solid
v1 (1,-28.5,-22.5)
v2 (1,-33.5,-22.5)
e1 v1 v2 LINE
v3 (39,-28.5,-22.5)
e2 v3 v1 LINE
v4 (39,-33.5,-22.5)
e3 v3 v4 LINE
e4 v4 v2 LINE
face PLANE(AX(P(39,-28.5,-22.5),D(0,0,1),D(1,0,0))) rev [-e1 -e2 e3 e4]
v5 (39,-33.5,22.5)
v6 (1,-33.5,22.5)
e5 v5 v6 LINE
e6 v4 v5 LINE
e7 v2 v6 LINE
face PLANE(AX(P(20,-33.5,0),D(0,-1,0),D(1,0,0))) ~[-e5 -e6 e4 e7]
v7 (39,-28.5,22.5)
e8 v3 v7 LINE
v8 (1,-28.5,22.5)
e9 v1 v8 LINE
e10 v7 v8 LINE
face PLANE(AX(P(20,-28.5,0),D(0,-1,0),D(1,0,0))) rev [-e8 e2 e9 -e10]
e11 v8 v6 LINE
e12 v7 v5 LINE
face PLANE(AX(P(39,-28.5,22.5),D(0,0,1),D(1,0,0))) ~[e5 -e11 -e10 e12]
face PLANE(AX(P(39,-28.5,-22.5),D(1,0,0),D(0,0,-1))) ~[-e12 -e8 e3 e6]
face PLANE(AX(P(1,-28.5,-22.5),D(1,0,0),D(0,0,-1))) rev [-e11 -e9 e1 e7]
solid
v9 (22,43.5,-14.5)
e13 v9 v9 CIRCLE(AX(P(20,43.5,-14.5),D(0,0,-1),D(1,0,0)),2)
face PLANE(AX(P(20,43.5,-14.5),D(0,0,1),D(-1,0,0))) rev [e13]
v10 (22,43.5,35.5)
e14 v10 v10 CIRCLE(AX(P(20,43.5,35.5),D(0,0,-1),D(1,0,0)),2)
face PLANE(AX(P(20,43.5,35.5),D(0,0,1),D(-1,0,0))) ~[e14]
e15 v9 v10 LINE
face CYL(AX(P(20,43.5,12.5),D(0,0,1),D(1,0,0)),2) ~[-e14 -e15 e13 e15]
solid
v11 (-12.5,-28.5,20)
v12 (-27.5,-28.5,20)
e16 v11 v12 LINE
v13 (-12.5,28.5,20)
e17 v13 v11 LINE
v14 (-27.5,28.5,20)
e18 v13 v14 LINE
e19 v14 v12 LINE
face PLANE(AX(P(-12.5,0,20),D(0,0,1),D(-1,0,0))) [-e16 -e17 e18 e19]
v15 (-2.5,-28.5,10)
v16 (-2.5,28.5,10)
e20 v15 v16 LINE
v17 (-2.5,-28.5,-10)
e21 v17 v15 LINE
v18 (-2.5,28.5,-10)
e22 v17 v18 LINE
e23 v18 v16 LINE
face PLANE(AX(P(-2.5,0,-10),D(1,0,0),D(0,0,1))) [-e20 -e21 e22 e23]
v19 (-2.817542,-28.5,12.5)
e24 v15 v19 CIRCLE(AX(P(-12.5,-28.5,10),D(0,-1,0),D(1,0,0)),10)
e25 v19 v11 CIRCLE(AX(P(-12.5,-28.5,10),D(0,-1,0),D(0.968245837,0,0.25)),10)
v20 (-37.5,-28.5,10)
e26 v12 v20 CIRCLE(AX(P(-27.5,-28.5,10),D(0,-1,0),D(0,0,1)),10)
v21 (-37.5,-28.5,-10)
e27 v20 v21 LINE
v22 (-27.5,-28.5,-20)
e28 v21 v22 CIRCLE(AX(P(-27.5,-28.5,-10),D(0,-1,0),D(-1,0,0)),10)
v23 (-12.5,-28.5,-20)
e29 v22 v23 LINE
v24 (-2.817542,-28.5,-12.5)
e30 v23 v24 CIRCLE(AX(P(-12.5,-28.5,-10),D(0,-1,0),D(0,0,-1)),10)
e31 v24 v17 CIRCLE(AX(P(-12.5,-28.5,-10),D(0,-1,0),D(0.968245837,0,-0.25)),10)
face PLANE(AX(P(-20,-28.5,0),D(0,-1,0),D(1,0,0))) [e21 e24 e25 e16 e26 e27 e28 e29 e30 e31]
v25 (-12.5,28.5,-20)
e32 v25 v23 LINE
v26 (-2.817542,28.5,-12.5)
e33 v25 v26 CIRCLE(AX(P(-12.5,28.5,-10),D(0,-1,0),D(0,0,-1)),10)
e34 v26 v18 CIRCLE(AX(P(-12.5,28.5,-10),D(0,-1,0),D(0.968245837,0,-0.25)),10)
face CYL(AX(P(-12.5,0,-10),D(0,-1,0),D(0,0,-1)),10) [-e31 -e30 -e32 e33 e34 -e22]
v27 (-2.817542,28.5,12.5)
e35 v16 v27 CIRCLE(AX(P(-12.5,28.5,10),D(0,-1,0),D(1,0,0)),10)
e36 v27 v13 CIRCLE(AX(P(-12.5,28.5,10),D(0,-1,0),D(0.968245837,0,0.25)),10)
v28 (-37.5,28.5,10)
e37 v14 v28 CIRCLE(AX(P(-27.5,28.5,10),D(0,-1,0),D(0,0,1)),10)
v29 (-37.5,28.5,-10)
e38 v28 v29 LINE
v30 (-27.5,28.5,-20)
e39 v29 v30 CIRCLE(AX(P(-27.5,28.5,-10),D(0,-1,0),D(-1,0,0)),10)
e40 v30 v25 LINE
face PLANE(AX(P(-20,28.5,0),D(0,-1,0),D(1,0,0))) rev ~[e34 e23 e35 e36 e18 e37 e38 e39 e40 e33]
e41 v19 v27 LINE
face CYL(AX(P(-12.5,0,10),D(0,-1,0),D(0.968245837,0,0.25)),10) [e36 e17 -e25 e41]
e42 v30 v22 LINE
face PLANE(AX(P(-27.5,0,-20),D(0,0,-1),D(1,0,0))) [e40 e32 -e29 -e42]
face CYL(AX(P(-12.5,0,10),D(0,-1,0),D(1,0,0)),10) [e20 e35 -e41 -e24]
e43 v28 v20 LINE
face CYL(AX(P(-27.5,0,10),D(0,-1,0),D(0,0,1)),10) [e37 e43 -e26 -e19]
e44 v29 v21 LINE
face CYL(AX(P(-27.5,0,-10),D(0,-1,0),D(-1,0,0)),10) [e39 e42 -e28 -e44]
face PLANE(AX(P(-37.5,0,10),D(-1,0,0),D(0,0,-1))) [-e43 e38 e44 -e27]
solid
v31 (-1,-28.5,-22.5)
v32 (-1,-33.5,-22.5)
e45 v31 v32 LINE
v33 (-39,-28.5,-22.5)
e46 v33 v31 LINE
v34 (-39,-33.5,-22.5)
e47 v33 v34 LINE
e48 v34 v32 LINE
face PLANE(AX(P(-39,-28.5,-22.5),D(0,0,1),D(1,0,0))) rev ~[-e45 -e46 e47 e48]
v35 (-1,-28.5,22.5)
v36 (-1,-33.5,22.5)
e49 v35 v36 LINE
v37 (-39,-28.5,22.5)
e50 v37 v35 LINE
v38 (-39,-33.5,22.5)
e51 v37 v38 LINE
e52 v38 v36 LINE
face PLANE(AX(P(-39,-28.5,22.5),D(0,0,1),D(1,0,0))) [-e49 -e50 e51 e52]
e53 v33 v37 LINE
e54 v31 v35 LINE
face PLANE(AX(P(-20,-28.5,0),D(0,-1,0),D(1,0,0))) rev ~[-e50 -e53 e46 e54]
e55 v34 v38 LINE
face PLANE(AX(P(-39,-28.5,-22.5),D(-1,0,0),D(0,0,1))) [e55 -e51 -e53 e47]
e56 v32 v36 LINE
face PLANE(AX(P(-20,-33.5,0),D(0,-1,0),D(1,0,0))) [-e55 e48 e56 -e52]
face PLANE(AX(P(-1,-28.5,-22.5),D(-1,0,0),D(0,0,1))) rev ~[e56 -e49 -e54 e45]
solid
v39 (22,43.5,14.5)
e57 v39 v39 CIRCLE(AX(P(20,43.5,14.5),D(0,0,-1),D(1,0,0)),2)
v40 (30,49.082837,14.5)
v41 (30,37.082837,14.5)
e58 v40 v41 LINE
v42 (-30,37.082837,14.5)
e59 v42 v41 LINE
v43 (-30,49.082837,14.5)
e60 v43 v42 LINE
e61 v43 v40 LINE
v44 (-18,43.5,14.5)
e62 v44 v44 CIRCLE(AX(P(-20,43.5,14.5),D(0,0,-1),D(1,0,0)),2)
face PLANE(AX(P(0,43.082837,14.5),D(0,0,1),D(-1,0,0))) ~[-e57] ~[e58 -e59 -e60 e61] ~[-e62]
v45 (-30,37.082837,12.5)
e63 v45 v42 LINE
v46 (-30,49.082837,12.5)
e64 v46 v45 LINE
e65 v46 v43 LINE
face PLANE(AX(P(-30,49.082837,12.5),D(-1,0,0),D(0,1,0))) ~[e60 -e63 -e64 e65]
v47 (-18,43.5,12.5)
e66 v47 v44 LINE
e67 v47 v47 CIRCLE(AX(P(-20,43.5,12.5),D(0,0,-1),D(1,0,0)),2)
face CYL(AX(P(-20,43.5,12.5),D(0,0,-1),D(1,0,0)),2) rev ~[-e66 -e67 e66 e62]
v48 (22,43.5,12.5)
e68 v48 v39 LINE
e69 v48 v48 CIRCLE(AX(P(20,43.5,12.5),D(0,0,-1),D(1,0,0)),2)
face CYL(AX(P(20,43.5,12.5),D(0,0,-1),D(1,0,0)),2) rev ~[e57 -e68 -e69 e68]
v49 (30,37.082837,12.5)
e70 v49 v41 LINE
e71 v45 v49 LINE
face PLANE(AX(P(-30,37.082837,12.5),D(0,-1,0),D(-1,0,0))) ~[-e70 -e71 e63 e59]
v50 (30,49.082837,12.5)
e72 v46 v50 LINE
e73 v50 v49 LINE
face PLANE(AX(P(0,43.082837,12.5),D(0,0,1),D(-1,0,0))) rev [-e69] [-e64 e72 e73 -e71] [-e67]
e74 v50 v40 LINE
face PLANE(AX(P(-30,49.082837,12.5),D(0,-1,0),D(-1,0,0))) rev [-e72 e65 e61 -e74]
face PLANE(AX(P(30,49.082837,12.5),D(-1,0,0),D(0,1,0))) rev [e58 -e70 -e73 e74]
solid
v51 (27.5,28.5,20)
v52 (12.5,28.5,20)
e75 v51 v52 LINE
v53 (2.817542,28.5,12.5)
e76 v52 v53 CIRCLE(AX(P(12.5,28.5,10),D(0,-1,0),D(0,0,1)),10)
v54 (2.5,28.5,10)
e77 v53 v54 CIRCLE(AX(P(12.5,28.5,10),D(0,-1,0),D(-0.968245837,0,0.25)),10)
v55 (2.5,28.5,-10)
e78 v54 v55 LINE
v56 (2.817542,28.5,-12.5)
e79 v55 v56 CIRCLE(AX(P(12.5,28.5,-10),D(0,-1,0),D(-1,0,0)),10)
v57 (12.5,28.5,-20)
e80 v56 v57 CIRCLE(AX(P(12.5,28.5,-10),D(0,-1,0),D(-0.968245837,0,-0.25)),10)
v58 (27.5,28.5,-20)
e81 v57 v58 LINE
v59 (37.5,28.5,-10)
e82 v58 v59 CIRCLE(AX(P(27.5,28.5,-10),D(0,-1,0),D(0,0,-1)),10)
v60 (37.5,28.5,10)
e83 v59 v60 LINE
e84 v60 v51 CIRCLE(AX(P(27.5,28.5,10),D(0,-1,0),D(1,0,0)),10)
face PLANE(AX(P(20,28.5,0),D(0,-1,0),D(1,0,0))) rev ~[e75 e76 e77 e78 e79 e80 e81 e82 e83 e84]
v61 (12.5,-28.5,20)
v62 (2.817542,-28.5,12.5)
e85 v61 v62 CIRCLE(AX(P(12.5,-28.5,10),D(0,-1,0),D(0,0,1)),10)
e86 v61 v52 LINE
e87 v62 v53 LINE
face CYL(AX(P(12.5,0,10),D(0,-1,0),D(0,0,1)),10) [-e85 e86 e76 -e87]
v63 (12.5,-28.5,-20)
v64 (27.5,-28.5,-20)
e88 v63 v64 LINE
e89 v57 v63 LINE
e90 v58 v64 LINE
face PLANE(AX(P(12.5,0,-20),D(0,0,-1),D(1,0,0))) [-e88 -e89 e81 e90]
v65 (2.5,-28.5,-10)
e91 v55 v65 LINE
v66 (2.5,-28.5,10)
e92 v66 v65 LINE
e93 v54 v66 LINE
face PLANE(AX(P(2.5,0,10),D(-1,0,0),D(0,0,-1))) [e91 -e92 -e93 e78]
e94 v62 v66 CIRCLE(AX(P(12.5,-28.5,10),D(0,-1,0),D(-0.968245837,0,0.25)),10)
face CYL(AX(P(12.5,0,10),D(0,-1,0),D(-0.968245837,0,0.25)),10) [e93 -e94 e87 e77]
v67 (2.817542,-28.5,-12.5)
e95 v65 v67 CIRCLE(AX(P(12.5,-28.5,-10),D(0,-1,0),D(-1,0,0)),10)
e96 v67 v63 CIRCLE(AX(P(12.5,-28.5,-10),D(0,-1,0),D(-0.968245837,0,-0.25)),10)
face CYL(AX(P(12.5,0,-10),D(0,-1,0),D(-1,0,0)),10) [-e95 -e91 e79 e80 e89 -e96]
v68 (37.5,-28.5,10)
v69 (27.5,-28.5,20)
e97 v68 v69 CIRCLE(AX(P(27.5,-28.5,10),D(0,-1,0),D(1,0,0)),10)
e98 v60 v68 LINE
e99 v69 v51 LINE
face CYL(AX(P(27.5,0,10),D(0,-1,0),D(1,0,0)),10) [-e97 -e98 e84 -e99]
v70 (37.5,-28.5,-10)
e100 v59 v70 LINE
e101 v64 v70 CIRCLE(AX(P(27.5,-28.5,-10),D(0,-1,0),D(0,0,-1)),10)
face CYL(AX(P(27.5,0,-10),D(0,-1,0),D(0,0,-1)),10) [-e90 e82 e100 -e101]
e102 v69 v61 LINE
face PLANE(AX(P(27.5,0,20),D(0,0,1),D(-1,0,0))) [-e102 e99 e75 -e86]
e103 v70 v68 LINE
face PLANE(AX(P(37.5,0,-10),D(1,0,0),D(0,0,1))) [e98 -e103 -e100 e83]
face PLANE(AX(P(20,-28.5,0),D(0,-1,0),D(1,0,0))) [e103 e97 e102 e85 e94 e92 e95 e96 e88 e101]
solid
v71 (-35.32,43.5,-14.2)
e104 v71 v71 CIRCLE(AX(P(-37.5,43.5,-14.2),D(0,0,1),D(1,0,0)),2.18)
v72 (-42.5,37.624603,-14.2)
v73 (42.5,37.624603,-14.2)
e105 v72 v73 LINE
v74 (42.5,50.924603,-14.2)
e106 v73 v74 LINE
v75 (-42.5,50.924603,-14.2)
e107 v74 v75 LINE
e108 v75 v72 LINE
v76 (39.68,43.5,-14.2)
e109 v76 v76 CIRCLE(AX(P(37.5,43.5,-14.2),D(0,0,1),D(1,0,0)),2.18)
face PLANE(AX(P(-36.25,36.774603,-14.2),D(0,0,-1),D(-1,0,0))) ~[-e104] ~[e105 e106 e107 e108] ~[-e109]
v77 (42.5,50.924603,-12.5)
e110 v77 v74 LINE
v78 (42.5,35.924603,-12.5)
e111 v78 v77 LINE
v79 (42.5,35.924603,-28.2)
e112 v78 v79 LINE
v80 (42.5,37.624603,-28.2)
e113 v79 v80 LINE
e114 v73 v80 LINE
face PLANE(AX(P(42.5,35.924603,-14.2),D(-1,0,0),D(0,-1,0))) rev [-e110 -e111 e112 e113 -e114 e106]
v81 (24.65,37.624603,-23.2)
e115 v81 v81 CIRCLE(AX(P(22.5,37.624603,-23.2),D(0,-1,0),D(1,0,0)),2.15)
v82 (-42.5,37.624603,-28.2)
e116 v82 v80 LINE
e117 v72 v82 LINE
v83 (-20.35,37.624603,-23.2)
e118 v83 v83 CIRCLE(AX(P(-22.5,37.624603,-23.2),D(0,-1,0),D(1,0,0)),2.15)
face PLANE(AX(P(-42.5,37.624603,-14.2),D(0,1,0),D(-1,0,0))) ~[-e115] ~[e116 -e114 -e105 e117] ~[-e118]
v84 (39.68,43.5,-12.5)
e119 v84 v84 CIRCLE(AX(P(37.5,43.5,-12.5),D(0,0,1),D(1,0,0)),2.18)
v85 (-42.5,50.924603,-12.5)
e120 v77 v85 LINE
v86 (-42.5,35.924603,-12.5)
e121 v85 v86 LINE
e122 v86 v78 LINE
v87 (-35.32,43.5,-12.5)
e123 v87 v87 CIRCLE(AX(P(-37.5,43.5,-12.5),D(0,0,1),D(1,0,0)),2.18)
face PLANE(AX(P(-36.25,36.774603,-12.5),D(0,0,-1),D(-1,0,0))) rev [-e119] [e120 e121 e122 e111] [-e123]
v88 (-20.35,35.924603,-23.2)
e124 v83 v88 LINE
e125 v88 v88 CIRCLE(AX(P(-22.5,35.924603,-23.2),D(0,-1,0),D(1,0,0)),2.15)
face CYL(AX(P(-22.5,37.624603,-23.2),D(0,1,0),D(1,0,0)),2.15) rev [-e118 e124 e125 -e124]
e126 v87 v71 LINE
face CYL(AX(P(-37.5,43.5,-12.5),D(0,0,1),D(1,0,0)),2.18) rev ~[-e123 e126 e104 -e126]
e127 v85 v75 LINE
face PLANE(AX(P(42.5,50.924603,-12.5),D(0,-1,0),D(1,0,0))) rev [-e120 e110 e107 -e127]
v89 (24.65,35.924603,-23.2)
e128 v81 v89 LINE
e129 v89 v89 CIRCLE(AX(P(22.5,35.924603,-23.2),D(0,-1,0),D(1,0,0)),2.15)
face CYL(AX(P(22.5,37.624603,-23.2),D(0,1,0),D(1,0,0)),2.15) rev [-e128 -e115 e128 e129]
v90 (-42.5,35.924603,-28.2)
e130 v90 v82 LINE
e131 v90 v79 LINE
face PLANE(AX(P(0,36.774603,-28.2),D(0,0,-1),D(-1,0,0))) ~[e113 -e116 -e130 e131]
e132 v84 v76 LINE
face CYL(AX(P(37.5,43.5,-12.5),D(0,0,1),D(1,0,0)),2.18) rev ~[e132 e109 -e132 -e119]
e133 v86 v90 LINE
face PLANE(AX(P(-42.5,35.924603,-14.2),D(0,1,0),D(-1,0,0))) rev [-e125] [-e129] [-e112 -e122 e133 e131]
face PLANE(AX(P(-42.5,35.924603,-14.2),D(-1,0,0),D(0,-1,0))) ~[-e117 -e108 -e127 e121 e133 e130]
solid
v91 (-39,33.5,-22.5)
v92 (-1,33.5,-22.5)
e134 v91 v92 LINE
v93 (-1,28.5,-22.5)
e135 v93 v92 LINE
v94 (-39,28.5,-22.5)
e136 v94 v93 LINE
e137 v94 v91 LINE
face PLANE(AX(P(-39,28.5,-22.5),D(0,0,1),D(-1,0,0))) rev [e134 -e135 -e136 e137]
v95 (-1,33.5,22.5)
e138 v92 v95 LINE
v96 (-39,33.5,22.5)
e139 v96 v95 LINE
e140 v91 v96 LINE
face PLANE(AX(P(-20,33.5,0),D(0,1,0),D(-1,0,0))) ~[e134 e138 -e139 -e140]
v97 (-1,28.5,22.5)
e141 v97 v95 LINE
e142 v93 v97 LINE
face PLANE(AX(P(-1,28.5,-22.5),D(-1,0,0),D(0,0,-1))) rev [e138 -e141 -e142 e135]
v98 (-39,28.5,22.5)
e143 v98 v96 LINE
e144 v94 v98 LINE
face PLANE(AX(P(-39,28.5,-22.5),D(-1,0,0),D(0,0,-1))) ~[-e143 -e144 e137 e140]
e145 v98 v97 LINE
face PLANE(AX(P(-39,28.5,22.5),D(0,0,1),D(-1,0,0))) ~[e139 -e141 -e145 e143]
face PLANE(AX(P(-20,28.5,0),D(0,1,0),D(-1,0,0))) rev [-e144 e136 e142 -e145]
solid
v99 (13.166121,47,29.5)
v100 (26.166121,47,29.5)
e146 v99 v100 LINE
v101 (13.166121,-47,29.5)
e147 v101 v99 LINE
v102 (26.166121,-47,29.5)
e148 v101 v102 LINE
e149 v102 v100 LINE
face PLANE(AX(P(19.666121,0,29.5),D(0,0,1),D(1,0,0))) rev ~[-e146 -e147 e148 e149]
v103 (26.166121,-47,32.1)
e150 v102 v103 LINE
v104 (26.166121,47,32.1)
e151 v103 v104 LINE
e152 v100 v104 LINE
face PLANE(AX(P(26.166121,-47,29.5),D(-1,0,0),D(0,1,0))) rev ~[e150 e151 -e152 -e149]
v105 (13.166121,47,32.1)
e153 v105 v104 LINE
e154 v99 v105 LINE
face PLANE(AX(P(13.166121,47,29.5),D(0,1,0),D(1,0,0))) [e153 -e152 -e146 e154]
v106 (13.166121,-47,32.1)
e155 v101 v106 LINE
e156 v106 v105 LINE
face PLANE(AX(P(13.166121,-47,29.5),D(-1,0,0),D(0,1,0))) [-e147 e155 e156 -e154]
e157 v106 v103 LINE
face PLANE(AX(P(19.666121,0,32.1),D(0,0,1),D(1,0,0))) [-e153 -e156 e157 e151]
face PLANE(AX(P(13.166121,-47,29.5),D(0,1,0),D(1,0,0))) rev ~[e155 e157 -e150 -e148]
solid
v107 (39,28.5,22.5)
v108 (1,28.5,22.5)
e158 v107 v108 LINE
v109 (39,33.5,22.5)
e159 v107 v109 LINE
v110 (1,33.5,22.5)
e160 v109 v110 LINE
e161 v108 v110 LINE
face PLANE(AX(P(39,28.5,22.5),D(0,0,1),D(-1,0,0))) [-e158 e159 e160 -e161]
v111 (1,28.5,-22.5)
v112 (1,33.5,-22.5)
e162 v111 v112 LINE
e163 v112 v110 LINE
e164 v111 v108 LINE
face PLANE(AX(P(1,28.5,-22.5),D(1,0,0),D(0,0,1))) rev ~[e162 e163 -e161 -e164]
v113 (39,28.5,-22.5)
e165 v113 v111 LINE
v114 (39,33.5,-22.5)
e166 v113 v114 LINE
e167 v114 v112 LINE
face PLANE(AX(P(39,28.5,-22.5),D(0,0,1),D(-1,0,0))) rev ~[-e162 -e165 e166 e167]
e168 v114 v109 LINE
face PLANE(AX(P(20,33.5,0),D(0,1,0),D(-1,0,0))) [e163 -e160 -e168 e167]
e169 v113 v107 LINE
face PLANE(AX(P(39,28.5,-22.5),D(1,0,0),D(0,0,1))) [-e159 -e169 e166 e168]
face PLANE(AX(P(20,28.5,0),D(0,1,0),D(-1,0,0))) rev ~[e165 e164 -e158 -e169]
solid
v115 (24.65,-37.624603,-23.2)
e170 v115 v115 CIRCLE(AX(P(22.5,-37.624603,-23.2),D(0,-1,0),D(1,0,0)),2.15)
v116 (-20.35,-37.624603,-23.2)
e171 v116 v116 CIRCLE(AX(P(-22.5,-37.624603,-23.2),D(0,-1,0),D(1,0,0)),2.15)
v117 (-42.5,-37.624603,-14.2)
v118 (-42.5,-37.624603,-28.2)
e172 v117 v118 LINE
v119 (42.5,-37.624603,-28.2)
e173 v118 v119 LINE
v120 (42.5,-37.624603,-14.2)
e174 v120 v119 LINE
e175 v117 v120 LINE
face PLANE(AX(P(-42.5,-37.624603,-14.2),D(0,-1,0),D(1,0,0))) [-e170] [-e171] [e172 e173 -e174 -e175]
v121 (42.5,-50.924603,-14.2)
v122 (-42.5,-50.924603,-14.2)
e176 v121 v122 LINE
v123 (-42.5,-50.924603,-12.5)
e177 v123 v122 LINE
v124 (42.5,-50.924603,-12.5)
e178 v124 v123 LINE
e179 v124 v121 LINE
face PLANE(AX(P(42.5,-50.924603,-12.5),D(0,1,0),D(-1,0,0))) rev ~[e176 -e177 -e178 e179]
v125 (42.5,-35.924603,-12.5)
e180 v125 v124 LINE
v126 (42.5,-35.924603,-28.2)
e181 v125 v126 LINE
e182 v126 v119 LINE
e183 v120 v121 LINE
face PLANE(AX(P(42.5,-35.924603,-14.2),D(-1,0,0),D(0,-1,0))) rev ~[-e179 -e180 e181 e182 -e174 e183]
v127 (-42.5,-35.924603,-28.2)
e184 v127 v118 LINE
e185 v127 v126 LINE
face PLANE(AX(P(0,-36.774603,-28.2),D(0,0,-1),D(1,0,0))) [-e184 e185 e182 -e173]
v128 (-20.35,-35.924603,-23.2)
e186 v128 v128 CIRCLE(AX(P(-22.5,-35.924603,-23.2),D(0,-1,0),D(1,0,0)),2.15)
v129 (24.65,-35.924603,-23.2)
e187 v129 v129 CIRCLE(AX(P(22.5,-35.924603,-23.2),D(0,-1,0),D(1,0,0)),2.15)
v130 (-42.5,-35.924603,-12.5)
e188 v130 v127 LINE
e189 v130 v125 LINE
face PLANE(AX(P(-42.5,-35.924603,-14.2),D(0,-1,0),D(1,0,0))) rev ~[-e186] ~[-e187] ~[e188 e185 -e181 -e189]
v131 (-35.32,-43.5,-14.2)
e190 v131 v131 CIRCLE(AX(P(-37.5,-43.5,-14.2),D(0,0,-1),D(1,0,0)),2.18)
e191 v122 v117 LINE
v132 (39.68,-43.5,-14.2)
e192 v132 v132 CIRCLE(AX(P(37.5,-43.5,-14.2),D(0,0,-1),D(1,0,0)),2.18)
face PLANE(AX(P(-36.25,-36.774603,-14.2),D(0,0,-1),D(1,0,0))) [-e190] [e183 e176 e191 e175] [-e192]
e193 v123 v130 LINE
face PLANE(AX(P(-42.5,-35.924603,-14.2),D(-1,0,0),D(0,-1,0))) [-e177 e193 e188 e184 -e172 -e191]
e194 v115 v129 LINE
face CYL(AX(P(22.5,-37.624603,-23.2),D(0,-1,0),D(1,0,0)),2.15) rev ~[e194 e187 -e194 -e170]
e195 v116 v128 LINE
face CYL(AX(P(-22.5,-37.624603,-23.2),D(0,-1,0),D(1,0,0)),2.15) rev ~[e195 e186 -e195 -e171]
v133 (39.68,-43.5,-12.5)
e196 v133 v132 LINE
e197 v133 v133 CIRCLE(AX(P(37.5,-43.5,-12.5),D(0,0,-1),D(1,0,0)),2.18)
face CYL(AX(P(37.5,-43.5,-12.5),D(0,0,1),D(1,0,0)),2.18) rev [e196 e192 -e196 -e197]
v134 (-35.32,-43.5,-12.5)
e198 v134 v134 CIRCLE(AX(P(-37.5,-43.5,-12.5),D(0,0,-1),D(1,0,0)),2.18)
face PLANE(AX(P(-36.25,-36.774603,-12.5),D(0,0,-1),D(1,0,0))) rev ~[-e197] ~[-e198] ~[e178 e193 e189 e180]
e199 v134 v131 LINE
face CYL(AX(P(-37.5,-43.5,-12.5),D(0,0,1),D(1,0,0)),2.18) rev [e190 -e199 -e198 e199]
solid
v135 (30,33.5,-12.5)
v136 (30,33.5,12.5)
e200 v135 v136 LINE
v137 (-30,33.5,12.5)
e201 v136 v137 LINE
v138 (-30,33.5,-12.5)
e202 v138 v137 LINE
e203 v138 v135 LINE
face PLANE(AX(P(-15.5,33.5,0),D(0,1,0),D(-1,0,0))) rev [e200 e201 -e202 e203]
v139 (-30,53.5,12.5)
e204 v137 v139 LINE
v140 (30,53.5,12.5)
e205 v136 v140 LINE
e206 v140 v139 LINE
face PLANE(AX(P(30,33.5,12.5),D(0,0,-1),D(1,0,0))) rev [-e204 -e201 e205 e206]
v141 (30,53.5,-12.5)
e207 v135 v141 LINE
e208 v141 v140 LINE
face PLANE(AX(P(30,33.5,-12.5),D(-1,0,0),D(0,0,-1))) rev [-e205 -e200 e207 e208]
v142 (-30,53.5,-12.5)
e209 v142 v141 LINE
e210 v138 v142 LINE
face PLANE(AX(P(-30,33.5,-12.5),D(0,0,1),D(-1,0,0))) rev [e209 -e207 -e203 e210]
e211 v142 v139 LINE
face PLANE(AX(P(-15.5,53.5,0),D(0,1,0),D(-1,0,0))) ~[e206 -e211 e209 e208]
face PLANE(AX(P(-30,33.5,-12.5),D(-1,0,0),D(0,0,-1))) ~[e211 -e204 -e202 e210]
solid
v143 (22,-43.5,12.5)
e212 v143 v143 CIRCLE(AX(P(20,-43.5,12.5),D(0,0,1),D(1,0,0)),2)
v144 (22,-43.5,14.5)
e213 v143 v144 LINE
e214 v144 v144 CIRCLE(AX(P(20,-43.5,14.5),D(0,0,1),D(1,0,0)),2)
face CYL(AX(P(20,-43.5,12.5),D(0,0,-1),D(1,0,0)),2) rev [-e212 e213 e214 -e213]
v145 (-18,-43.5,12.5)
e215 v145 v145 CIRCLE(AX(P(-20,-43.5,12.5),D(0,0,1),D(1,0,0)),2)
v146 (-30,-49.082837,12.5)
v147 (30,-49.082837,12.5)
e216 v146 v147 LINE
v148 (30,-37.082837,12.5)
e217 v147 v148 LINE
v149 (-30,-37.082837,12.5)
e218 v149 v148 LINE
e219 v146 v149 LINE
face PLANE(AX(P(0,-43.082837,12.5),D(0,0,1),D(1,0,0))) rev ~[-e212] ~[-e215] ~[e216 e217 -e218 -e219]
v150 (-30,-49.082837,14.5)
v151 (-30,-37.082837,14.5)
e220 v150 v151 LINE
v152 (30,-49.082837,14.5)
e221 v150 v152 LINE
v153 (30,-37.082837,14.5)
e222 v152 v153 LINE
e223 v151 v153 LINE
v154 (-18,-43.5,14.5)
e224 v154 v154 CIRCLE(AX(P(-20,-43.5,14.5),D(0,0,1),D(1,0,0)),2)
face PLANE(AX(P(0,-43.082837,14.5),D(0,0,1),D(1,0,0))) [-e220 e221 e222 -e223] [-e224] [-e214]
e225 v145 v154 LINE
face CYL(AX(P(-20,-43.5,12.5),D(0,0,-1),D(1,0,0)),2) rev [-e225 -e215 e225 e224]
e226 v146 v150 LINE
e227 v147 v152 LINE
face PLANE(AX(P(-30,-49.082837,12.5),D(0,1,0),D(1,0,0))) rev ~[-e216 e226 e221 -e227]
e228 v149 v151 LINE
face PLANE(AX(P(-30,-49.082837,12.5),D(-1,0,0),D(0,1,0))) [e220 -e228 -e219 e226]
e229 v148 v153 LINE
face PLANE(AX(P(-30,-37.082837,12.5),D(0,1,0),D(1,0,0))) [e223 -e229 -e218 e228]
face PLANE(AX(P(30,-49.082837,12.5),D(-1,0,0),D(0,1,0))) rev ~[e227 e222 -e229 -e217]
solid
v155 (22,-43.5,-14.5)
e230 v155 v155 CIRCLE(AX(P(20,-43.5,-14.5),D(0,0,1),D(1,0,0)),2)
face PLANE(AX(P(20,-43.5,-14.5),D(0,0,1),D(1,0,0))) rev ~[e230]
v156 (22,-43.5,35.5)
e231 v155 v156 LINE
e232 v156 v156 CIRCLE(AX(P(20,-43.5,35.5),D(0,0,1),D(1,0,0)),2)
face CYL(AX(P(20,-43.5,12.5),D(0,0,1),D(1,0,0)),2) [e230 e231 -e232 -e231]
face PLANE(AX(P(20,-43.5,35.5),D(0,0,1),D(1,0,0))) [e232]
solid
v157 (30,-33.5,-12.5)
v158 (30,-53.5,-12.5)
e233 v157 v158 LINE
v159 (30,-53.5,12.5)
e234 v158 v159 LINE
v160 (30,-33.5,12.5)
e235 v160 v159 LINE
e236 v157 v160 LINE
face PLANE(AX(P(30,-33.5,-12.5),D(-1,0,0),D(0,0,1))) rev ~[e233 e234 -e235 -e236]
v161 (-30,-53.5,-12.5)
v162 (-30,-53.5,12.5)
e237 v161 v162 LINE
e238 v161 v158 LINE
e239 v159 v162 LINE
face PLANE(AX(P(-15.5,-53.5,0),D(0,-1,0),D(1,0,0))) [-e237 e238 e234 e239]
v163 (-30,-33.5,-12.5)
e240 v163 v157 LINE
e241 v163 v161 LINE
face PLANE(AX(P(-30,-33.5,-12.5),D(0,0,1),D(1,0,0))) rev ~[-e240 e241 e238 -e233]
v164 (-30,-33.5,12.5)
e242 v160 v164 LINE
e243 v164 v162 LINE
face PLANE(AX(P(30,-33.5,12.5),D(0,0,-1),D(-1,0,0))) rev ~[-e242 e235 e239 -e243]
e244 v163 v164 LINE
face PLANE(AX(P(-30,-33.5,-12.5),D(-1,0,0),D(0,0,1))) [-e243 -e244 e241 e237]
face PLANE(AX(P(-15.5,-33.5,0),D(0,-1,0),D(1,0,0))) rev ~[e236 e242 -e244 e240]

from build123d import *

# Parameters (mm, degrees)
F0_W           = 20
F0_H           = 25
F1_DEPTH       = 28.5
F2_W           = 38
F2_H           = 45
F3_DEPTH       = 5
F6_W           = 29
F6_H           = 25
F6_W_2         = 31
F7_DEPTH       = 20
F9_W           = 60
F9_H           = 12
F9_R           = 2
F10_DEPTH      = 2
F12_W          = 12.5
F12_H          = 1.7
F12_H_2        = 13.3
F12_R          = 2.18
F12_W_2        = 60
F13_DEPTH      = 1.7
F14_W          = 85
F14_H          = 1.7
F15_DEPTH      = 14
F16_R          = 2.15
F17_DEPTH      = 1.7
F20_W          = 13
F20_H          = 94
F21_DEPTH      = 2.6
F22_DEPTH      = 23
F22_DEPTH_BACK = 27


with BuildPart() as f1:
    # F0 (on Front) → F1 (new body, symmetric)
    with BuildSketch(Plane.XZ):
        with Locations((-20, 0)):
            Rectangle(F0_W, F0_H)
        with BuildLine():
            ThreePointArc((-12.5, -20), (-6.376275643, -17.9056941504), (-2.8175416345, -12.5))
            Line((-2.8175416345, -12.5), (-10, -12.5))
            Line((-10, -12.5), (-30, -12.5))
            Line((-30, -12.5), (-30, 12.5))
            Line((-30, 12.5), (-10, 12.5))
            Line((-10, 12.5), (-2.8175416345, 12.5))
            ThreePointArc((-2.8175416345, 12.5), (-6.376275643, 17.9056941504), (-12.5, 20))
            Line((-12.5, 20), (-27.5, 20))
            ThreePointArc((-27.5, 20), (-34.5710678119, 17.0710678119), (-37.5, 10))
            Line((-37.5, 10), (-37.5, -10))
            ThreePointArc((-37.5, -10), (-34.5710678119, -17.0710678119), (-27.5, -20))
            Line((-27.5, -20), (-12.5, -20))
        make_face()
        with BuildLine():
            Line((-10, -12.5), (-2.8175416345, -12.5))
            ThreePointArc((-2.8175416345, -12.5), (-2.5797030373, -11.2600429248), (-2.5, -10))
            Line((-2.5, -10), (-2.5, 10))
            ThreePointArc((-2.5, 10), (-2.5797030373, 11.2600429248), (-2.8175416345, 12.5))
            Line((-2.8175416345, 12.5), (-10, 12.5))
            Line((-10, 12.5), (-10, -12.5))
        make_face()
    extrude(amount=F1_DEPTH, both=True)


with BuildPart() as f1b:
    # F0 (on Front) → F1, piece 2 (new body, symmetric)
    with BuildSketch(Plane.XZ):
        with Locations((20, 0)):
            Rectangle(F0_W, F0_H)
        with BuildLine():
            Line((2.8175416345, -12.5), (10, -12.5))
            Line((10, -12.5), (10, 12.5))
            Line((10, 12.5), (2.8175416345, 12.5))
            ThreePointArc((2.8175416345, 12.5), (2.5797030373, 11.2600429248), (2.5, 10))
            Line((2.5, 10), (2.5, -10))
            ThreePointArc((2.5, -10), (2.5797030373, -11.2600429248), (2.8175416345, -12.5))
        make_face()
        with BuildLine():
            Line((30, 12.5), (30, -12.5))
            Line((30, -12.5), (10, -12.5))
            Line((10, -12.5), (2.8175416345, -12.5))
            ThreePointArc((2.8175416345, -12.5), (6.376275643, -17.9056941504), (12.5, -20))
            Line((12.5, -20), (27.5, -20))
            ThreePointArc((27.5, -20), (34.5710678119, -17.0710678119), (37.5, -10))
            Line((37.5, -10), (37.5, 10))
            ThreePointArc((37.5, 10), (34.5710678119, 17.0710678119), (27.5, 20))
            Line((27.5, 20), (12.5, 20))
            ThreePointArc((12.5, 20), (6.376275643, 17.9056941504), (2.8175416345, 12.5))
            Line((2.8175416345, 12.5), (10, 12.5))
            Line((10, 12.5), (30, 12.5))
        make_face()
    extrude(amount=F1_DEPTH, both=True)


with BuildPart() as f3:
    # F2 (on face) → F3 (new body)
    with BuildSketch(Plane.XZ.offset(28.5)):
        with Locations((-20, 0)):
            Rectangle(F2_W, F2_H)
        with BuildLine():
            Line((-27.5, 20), (-12.5, 20))
            ThreePointArc((-12.5, 20), (-5.4289321881, 17.0710678119), (-2.5, 10))
            Line((-2.5, 10), (-2.5, -10))
            ThreePointArc((-2.5, -10), (-5.4289321881, -17.0710678119), (-12.5, -20))
            Line((-12.5, -20), (-27.5, -20))
            ThreePointArc((-27.5, -20), (-34.5710678119, -17.0710678119), (-37.5, -10))
            Line((-37.5, -10), (-37.5, 10))
            ThreePointArc((-37.5, 10), (-34.5710678119, 17.0710678119), (-27.5, 20))
        make_face(mode=Mode.SUBTRACT)
        with BuildLine():
            ThreePointArc((-2.5, 10), (-5.4289321881, 17.0710678119), (-12.5, 20))
            Line((-12.5, 20), (-27.5, 20))
            ThreePointArc((-27.5, 20), (-34.5710678119, 17.0710678119), (-37.5, 10))
            Line((-37.5, 10), (-37.5, -10))
            ThreePointArc((-37.5, -10), (-34.5710678119, -17.0710678119), (-27.5, -20))
            Line((-27.5, -20), (-12.5, -20))
            ThreePointArc((-12.5, -20), (-5.4289321881, -17.0710678119), (-2.5, -10))
            Line((-2.5, -10), (-2.5, 10))
        make_face()
    extrude(amount=F3_DEPTH)


with BuildPart() as f4_1:
    # F4: instance of F3
    add(f3.part.mirror(Plane.YZ))


with BuildPart() as f5_1:
    # F5: instance of F3
    add(f3.part.mirror(Plane.XZ))


with BuildPart() as f5_2:
    # F5: instance of F4_1
    add(f4_1.part.mirror(Plane.XZ))


with BuildPart() as f7:
    # F6 (on face) → F7 (new body)
    with BuildSketch(Plane.XZ.offset(33.5)):
        with Locations((-15.5, 0)):
            Rectangle(F6_W, F6_H)
        with Locations((14.5, 0)):
            Rectangle(F6_W_2, F6_H)
    extrude(amount=F7_DEPTH)


with BuildPart() as f8_1:
    # F8: instance of F7
    add(f7.part.mirror(Plane.XZ))


with BuildPart() as f10:
    # F9 (on face) → F10 (new body)
    with BuildSketch(Plane.XY.offset(12.5)):
        with Locations((0, -43.0828370154)):
            Rectangle(F9_W, F9_H)
        with Locations((-20, -43.5)):
            Circle(F9_R, mode=Mode.SUBTRACT)
        with Locations((20, -43.5)):
            Circle(F9_R, mode=Mode.SUBTRACT)
    extrude(amount=F10_DEPTH)


with BuildPart() as f11_1:
    # F11: instance of F10
    add(f10.part.mirror(Plane.XZ))


with BuildPart() as f13:
    # F12 (on face) → F13 (new body)
    with BuildSketch(Plane(origin=(0, 0, -12.5), x_dir=(1, 0, 0), z_dir=(0, 0, -1))):
        with Locations((-36.25, 36.774602598)):
            Rectangle(F12_W, F12_H)
        with Locations((-36.25, 44.274602598)):
            Rectangle(F12_W, F12_H_2)
        with Locations((-37.5, 43.5)):
            Circle(F12_R, mode=Mode.SUBTRACT)
        with Locations((36.25, 36.774602598)):
            Rectangle(F12_W, F12_H)
        with Locations((36.25, 44.274602598)):
            Rectangle(F12_W, F12_H_2)
        with Locations((37.5, 43.5)):
            Circle(F12_R, mode=Mode.SUBTRACT)
        with Locations((0, 36.774602598)):
            Rectangle(F12_W_2, F12_H)
        with Locations((0, 44.274602598)):
            Rectangle(F12_W_2, F12_H_2)
    extrude(amount=F13_DEPTH)

    # F14 (on face) → F15 (join)
    with BuildSketch(Plane(origin=(0, 0, -14.2), x_dir=(1, 0, 0), z_dir=(0, 0, -1))):
        with Locations((0, 36.774602598)):
            Rectangle(F14_W, F14_H)
    extrude(amount=F15_DEPTH)

    # F16 (on face) → F17 (cut, through all)
    with BuildSketch(Plane.XZ.offset(37.624602598)):
        with Locations((-22.5, -23.2)):
            Circle(F16_R)
        with Locations((22.5, -23.2)):
            Circle(F16_R)
    extrude(amount=-F17_DEPTH, mode=Mode.SUBTRACT)


with BuildPart() as f18_1:
    # F18: instance of F13
    add(f13.part.mirror(Plane.XZ))


with BuildPart() as f21:
    # F20 (on offset) → F21 (new body)
    with BuildSketch(Plane.XY.offset(29.5)):
        with Locations((19.6661213413, 0)):
            Rectangle(F20_W, F20_H)
    extrude(amount=F21_DEPTH)


with BuildPart() as f22:
    # F9 (on face) → F22 (new body, two sides)
    with BuildSketch(Plane.XY.offset(12.5)) as f22_sk:
        with Locations((20, -43.5)):
            Circle(F9_R)
    extrude(amount=F22_DEPTH)
    extrude(f22_sk.sketch, amount=-F22_DEPTH_BACK)


with BuildPart() as f23_1:
    # F23: instance of F22
    add(f22.part.mirror(Plane.XZ))


solid = Compound([f1.part, f1b.part, f3.part, f4_1.part, f5_1.part, f5_2.part, f7.part, f8_1.part, f10.part, f11_1.part, f13.part, f18_1.part, f21.part, f22.part, f23_1.part])
